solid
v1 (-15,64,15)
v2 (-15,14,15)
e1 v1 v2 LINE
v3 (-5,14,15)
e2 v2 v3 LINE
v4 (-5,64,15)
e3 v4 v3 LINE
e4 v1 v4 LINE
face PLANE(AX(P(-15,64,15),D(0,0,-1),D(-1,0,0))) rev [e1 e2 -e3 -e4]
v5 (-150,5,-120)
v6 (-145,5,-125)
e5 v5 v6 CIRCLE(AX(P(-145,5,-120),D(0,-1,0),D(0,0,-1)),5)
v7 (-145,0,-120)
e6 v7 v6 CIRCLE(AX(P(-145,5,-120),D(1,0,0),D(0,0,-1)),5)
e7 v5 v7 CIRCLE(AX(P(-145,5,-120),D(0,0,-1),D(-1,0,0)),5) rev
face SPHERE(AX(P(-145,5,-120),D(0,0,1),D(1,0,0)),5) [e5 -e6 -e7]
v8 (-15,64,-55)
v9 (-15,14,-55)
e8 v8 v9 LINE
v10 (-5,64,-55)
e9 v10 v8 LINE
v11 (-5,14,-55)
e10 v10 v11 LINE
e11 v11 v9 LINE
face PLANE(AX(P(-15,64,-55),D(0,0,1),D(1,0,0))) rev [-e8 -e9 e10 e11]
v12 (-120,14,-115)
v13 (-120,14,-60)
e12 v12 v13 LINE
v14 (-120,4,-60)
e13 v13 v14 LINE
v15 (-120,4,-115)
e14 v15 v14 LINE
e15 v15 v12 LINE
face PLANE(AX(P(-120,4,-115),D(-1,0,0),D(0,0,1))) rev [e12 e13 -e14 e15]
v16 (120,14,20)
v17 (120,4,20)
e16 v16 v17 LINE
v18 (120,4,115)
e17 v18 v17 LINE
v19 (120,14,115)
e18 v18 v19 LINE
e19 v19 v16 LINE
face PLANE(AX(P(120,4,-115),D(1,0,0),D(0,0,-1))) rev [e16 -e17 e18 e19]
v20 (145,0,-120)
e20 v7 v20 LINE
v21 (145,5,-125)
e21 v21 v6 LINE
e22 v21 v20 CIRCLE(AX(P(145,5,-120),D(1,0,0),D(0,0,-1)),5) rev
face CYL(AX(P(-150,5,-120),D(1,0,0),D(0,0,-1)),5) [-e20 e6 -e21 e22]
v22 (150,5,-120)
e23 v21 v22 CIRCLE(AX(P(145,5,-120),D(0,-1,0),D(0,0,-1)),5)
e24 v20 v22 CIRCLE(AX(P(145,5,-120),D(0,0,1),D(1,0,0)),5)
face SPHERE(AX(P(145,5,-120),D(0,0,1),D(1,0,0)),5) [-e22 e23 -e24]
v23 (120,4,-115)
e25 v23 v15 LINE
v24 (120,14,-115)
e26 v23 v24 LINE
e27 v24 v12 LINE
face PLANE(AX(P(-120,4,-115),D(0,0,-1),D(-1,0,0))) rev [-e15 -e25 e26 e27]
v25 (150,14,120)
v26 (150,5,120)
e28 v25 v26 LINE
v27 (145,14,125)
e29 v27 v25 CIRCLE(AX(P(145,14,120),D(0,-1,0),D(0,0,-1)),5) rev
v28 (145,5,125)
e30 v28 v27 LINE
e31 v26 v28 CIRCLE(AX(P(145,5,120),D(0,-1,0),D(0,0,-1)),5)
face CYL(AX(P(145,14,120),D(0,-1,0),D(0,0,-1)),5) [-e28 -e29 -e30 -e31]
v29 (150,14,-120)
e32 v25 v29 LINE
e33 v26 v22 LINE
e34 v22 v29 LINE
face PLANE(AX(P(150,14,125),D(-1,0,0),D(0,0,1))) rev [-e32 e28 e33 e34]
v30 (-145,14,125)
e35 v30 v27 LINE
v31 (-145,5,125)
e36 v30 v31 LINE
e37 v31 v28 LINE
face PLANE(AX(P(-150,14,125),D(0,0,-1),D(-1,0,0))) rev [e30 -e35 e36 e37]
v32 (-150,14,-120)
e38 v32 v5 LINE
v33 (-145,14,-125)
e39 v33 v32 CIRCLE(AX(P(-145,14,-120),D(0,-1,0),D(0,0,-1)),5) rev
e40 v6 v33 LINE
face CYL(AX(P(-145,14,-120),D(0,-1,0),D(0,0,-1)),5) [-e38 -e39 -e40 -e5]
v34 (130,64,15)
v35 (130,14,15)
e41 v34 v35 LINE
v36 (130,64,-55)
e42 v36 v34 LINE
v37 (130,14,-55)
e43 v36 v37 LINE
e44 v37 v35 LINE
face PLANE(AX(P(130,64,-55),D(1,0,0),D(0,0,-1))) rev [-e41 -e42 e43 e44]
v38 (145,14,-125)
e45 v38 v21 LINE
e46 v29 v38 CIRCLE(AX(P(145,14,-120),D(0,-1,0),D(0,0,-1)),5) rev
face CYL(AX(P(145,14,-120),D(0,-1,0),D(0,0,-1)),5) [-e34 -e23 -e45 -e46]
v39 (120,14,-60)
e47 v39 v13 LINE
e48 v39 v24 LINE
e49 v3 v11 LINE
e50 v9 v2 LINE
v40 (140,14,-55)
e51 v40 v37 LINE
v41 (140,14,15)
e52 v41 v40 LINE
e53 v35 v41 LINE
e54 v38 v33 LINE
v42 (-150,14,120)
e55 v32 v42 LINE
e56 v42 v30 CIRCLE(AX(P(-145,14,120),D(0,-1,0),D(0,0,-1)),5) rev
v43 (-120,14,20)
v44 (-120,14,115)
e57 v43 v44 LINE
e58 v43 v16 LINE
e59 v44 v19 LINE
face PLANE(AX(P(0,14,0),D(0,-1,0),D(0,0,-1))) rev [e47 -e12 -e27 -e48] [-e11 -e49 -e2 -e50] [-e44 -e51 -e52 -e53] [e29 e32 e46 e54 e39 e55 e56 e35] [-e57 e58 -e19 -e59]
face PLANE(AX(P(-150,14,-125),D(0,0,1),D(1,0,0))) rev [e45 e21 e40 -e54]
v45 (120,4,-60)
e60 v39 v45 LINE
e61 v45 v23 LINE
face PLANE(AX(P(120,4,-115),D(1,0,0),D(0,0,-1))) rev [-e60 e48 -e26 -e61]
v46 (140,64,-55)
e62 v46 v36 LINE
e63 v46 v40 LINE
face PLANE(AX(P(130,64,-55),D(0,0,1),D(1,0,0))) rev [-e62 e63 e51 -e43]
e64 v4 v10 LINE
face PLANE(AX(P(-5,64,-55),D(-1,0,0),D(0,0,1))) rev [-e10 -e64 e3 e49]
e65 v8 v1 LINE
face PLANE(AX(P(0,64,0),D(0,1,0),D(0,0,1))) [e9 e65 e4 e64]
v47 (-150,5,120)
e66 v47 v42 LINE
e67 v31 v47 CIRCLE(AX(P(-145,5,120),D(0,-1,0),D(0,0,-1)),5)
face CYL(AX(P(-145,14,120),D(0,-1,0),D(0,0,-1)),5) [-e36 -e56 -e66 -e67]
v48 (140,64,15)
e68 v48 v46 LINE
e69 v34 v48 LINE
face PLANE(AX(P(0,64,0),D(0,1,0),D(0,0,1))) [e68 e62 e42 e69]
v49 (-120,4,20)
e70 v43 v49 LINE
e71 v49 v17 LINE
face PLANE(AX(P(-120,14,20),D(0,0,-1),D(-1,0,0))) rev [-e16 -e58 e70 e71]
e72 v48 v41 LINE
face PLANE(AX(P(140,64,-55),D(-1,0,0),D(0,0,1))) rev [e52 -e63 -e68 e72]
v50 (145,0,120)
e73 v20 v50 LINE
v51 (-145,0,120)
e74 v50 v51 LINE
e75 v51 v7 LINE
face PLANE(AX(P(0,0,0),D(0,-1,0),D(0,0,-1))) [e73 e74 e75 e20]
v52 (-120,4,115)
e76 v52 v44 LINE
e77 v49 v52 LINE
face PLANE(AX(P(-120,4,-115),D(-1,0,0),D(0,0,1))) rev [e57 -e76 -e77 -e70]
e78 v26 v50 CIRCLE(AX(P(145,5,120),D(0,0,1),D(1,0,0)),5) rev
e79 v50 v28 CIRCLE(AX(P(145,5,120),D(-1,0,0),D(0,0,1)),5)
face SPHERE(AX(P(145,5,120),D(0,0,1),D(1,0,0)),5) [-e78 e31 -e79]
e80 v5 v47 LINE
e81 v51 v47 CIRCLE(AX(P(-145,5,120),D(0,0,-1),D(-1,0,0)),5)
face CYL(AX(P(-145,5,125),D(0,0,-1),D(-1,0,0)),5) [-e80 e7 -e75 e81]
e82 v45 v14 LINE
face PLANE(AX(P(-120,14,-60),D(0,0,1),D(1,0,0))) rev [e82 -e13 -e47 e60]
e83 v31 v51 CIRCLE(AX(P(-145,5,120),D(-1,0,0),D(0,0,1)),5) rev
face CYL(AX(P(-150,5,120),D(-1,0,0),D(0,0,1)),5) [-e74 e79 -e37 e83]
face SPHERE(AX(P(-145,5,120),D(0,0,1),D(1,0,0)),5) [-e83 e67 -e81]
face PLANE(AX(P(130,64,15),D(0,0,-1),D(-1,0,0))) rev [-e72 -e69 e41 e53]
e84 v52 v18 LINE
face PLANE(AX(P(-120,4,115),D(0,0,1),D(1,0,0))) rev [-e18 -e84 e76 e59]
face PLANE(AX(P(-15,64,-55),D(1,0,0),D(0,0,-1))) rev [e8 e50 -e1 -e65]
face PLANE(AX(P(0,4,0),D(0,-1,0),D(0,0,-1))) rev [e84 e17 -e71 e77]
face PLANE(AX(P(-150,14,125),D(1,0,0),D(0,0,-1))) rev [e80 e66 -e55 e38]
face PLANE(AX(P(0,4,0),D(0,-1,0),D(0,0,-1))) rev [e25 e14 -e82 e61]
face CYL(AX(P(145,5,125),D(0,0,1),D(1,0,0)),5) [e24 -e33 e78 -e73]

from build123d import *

# Parameters (mm, degrees)
SKETCH1_W          = 300
SKETCH1_H          = 250
BASE_DEPTH         = 14
SKETCH3_W          = 240
SKETCH3_H          = 230
CUT_EXTRUDE1_DEPTH = 10
FILLET1_R          = 5
FILLET2_R          = 5
SKETCH4_W          = 240
SKETCH4_H          = 80
DIN_BASE_DEPTH     = 10
SKETCH5_W          = 10
SKETCH5_H          = 70
DIN_STAND_DEPTH    = 50


with BuildPart() as part:
    # Sketch1 → Base (new body)
    with BuildSketch(Plane(origin=(0, 0, 0), x_dir=(1, 0, 0), z_dir=(0, 1, 0))):
        Rectangle(SKETCH1_W, SKETCH1_H)
    extrude(amount=BASE_DEPTH)

    # Sketch3 → Cut-Extrude1 (cut)
    with BuildSketch(Plane(origin=(0, 14, 0), x_dir=(1, 0, 0), z_dir=(0, 1, 0))):
        Rectangle(SKETCH3_W, SKETCH3_H)
    extrude(amount=-CUT_EXTRUDE1_DEPTH, mode=Mode.SUBTRACT)

    # Fillet1
    fillet1_edges = [part.edges().sort_by_distance(p)[0] for p in [
        (0, 0, 125),
        (-150, 0, 0),
        (0, 0, -125),
        (150, 0, 0),
    ]]
    fillet(fillet1_edges, radius=FILLET1_R)

    # Fillet2
    # the kernel refuses this fillet: 5 mm, written as the material it takes off along each edge
    with BuildSketch(Plane(origin=(145, 5, 120), x_dir=(1, 0, 0), z_dir=(0, 0, 1))) as fillet2_piece_1_section:
        Polygon((0, 0), (FILLET2_R, 0), (FILLET2_R, -FILLET2_R), (0, -FILLET2_R), align=None)
    fillet2_piece_1 = extrude(amount=FILLET2_R, mode=Mode.PRIVATE)
    fillet2_piece_1 = fillet2_piece_1 - Plane(origin=(145, 5, 120), x_dir=(-0.7071067811865475, 0.7071067811865475, 0), z_dir=(0, 0, 1)) * Sphere(FILLET2_R, mode=Mode.PRIVATE)
    add(fillet2_piece_1, mode=Mode.SUBTRACT)
    with BuildSketch(Plane(origin=(-145, 5, 120), x_dir=(-1, 0, 0), z_dir=(0, 0, 1))) as fillet2_piece_2_section:
        Polygon((0, 0), (FILLET2_R, 0), (FILLET2_R, FILLET2_R), (0, FILLET2_R), align=None)
    fillet2_piece_2 = extrude(amount=FILLET2_R, mode=Mode.PRIVATE)
    fillet2_piece_2 = fillet2_piece_2 - Plane(origin=(-145, 5, 120), x_dir=(0.7071067811865475, 0.7071067811865475, 0), z_dir=(0, 0, 1)) * Sphere(FILLET2_R, mode=Mode.PRIVATE)
    add(fillet2_piece_2, mode=Mode.SUBTRACT)
    with BuildSketch(Plane(origin=(145, 5, -120), x_dir=(0, 0, -1), z_dir=(1, 0, 0))) as fillet2_piece_3_section:
        Polygon((0, 0), (FILLET2_R, 0), (FILLET2_R, -FILLET2_R), (0, -FILLET2_R), align=None)
    fillet2_piece_3 = extrude(amount=FILLET2_R, mode=Mode.PRIVATE)
    fillet2_piece_3 = fillet2_piece_3 - Plane(origin=(145, 5, -120), x_dir=(0, 0.7071067811865475, 0.7071067811865475), z_dir=(1, 0, 0)) * Sphere(FILLET2_R, mode=Mode.PRIVATE)
    add(fillet2_piece_3, mode=Mode.SUBTRACT)
    with BuildSketch(Plane(origin=(-145, 5, -120), x_dir=(0, 0, -1), z_dir=(-1, 0, 0))) as fillet2_piece_4_section:
        Polygon((0, 0), (FILLET2_R, 0), (FILLET2_R, FILLET2_R), (0, FILLET2_R), align=None)
    fillet2_piece_4 = extrude(amount=FILLET2_R, mode=Mode.PRIVATE)
    fillet2_piece_4 = fillet2_piece_4 - Plane(origin=(-145, 5, -120), x_dir=(0, 0.7071067811865475, 0.7071067811865475), z_dir=(-1, 0, 0)) * Sphere(FILLET2_R, mode=Mode.PRIVATE)
    add(fillet2_piece_4, mode=Mode.SUBTRACT)
    with BuildSketch(Plane(origin=(150, 5, 125), x_dir=(-1, 0, 0), z_dir=(0, 1, 0)), Plane(origin=(150, 5, -125), x_dir=(0, 0, 1), z_dir=(0, 1, 0))) as fillet2_piece_5:
        with BuildLine():
            CenterArc((FILLET2_R, -FILLET2_R), FILLET2_R, 90, 90)
            Line((0, -FILLET2_R), (0, 0))
            Line((0, 0), (FILLET2_R, 0))
        make_face()
    extrude(amount=21.5, mode=Mode.SUBTRACT)
    with BuildSketch(Plane(origin=(-150, 5, 125), x_dir=(1, 0, 0), z_dir=(0, 1, 0)), Plane(origin=(-150, 5, -125), x_dir=(0, 0, 1), z_dir=(0, 1, 0))) as fillet2_piece_6:
        with BuildLine():
            CenterArc((FILLET2_R, FILLET2_R), FILLET2_R, 180, 90)
            Line((0, FILLET2_R), (0, 0))
            Line((0, 0), (FILLET2_R, 0))
        make_face()
    extrude(amount=21.5, mode=Mode.SUBTRACT)

    # Sketch4 → DIN Base (add)
    with BuildSketch(Plane(origin=(0, 4, 0), x_dir=(1, 0, 0), z_dir=(0, 1, 0))):
        with Locations((0, 20)):
            Rectangle(SKETCH4_W, SKETCH4_H)
    extrude(amount=DIN_BASE_DEPTH)

    # Sketch5 → DIN Stand (add)
    with BuildSketch(Plane(origin=(0, 14, 0), x_dir=(1, 0, 0), z_dir=(0, 1, 0))):
        with Locations((135, 20)):
            Rectangle(SKETCH5_W, SKETCH5_H)
        with Locations((-10, 20)):
            Rectangle(SKETCH5_W, SKETCH5_H)
    extrude(amount=DIN_STAND_DEPTH)


solid = part.part
